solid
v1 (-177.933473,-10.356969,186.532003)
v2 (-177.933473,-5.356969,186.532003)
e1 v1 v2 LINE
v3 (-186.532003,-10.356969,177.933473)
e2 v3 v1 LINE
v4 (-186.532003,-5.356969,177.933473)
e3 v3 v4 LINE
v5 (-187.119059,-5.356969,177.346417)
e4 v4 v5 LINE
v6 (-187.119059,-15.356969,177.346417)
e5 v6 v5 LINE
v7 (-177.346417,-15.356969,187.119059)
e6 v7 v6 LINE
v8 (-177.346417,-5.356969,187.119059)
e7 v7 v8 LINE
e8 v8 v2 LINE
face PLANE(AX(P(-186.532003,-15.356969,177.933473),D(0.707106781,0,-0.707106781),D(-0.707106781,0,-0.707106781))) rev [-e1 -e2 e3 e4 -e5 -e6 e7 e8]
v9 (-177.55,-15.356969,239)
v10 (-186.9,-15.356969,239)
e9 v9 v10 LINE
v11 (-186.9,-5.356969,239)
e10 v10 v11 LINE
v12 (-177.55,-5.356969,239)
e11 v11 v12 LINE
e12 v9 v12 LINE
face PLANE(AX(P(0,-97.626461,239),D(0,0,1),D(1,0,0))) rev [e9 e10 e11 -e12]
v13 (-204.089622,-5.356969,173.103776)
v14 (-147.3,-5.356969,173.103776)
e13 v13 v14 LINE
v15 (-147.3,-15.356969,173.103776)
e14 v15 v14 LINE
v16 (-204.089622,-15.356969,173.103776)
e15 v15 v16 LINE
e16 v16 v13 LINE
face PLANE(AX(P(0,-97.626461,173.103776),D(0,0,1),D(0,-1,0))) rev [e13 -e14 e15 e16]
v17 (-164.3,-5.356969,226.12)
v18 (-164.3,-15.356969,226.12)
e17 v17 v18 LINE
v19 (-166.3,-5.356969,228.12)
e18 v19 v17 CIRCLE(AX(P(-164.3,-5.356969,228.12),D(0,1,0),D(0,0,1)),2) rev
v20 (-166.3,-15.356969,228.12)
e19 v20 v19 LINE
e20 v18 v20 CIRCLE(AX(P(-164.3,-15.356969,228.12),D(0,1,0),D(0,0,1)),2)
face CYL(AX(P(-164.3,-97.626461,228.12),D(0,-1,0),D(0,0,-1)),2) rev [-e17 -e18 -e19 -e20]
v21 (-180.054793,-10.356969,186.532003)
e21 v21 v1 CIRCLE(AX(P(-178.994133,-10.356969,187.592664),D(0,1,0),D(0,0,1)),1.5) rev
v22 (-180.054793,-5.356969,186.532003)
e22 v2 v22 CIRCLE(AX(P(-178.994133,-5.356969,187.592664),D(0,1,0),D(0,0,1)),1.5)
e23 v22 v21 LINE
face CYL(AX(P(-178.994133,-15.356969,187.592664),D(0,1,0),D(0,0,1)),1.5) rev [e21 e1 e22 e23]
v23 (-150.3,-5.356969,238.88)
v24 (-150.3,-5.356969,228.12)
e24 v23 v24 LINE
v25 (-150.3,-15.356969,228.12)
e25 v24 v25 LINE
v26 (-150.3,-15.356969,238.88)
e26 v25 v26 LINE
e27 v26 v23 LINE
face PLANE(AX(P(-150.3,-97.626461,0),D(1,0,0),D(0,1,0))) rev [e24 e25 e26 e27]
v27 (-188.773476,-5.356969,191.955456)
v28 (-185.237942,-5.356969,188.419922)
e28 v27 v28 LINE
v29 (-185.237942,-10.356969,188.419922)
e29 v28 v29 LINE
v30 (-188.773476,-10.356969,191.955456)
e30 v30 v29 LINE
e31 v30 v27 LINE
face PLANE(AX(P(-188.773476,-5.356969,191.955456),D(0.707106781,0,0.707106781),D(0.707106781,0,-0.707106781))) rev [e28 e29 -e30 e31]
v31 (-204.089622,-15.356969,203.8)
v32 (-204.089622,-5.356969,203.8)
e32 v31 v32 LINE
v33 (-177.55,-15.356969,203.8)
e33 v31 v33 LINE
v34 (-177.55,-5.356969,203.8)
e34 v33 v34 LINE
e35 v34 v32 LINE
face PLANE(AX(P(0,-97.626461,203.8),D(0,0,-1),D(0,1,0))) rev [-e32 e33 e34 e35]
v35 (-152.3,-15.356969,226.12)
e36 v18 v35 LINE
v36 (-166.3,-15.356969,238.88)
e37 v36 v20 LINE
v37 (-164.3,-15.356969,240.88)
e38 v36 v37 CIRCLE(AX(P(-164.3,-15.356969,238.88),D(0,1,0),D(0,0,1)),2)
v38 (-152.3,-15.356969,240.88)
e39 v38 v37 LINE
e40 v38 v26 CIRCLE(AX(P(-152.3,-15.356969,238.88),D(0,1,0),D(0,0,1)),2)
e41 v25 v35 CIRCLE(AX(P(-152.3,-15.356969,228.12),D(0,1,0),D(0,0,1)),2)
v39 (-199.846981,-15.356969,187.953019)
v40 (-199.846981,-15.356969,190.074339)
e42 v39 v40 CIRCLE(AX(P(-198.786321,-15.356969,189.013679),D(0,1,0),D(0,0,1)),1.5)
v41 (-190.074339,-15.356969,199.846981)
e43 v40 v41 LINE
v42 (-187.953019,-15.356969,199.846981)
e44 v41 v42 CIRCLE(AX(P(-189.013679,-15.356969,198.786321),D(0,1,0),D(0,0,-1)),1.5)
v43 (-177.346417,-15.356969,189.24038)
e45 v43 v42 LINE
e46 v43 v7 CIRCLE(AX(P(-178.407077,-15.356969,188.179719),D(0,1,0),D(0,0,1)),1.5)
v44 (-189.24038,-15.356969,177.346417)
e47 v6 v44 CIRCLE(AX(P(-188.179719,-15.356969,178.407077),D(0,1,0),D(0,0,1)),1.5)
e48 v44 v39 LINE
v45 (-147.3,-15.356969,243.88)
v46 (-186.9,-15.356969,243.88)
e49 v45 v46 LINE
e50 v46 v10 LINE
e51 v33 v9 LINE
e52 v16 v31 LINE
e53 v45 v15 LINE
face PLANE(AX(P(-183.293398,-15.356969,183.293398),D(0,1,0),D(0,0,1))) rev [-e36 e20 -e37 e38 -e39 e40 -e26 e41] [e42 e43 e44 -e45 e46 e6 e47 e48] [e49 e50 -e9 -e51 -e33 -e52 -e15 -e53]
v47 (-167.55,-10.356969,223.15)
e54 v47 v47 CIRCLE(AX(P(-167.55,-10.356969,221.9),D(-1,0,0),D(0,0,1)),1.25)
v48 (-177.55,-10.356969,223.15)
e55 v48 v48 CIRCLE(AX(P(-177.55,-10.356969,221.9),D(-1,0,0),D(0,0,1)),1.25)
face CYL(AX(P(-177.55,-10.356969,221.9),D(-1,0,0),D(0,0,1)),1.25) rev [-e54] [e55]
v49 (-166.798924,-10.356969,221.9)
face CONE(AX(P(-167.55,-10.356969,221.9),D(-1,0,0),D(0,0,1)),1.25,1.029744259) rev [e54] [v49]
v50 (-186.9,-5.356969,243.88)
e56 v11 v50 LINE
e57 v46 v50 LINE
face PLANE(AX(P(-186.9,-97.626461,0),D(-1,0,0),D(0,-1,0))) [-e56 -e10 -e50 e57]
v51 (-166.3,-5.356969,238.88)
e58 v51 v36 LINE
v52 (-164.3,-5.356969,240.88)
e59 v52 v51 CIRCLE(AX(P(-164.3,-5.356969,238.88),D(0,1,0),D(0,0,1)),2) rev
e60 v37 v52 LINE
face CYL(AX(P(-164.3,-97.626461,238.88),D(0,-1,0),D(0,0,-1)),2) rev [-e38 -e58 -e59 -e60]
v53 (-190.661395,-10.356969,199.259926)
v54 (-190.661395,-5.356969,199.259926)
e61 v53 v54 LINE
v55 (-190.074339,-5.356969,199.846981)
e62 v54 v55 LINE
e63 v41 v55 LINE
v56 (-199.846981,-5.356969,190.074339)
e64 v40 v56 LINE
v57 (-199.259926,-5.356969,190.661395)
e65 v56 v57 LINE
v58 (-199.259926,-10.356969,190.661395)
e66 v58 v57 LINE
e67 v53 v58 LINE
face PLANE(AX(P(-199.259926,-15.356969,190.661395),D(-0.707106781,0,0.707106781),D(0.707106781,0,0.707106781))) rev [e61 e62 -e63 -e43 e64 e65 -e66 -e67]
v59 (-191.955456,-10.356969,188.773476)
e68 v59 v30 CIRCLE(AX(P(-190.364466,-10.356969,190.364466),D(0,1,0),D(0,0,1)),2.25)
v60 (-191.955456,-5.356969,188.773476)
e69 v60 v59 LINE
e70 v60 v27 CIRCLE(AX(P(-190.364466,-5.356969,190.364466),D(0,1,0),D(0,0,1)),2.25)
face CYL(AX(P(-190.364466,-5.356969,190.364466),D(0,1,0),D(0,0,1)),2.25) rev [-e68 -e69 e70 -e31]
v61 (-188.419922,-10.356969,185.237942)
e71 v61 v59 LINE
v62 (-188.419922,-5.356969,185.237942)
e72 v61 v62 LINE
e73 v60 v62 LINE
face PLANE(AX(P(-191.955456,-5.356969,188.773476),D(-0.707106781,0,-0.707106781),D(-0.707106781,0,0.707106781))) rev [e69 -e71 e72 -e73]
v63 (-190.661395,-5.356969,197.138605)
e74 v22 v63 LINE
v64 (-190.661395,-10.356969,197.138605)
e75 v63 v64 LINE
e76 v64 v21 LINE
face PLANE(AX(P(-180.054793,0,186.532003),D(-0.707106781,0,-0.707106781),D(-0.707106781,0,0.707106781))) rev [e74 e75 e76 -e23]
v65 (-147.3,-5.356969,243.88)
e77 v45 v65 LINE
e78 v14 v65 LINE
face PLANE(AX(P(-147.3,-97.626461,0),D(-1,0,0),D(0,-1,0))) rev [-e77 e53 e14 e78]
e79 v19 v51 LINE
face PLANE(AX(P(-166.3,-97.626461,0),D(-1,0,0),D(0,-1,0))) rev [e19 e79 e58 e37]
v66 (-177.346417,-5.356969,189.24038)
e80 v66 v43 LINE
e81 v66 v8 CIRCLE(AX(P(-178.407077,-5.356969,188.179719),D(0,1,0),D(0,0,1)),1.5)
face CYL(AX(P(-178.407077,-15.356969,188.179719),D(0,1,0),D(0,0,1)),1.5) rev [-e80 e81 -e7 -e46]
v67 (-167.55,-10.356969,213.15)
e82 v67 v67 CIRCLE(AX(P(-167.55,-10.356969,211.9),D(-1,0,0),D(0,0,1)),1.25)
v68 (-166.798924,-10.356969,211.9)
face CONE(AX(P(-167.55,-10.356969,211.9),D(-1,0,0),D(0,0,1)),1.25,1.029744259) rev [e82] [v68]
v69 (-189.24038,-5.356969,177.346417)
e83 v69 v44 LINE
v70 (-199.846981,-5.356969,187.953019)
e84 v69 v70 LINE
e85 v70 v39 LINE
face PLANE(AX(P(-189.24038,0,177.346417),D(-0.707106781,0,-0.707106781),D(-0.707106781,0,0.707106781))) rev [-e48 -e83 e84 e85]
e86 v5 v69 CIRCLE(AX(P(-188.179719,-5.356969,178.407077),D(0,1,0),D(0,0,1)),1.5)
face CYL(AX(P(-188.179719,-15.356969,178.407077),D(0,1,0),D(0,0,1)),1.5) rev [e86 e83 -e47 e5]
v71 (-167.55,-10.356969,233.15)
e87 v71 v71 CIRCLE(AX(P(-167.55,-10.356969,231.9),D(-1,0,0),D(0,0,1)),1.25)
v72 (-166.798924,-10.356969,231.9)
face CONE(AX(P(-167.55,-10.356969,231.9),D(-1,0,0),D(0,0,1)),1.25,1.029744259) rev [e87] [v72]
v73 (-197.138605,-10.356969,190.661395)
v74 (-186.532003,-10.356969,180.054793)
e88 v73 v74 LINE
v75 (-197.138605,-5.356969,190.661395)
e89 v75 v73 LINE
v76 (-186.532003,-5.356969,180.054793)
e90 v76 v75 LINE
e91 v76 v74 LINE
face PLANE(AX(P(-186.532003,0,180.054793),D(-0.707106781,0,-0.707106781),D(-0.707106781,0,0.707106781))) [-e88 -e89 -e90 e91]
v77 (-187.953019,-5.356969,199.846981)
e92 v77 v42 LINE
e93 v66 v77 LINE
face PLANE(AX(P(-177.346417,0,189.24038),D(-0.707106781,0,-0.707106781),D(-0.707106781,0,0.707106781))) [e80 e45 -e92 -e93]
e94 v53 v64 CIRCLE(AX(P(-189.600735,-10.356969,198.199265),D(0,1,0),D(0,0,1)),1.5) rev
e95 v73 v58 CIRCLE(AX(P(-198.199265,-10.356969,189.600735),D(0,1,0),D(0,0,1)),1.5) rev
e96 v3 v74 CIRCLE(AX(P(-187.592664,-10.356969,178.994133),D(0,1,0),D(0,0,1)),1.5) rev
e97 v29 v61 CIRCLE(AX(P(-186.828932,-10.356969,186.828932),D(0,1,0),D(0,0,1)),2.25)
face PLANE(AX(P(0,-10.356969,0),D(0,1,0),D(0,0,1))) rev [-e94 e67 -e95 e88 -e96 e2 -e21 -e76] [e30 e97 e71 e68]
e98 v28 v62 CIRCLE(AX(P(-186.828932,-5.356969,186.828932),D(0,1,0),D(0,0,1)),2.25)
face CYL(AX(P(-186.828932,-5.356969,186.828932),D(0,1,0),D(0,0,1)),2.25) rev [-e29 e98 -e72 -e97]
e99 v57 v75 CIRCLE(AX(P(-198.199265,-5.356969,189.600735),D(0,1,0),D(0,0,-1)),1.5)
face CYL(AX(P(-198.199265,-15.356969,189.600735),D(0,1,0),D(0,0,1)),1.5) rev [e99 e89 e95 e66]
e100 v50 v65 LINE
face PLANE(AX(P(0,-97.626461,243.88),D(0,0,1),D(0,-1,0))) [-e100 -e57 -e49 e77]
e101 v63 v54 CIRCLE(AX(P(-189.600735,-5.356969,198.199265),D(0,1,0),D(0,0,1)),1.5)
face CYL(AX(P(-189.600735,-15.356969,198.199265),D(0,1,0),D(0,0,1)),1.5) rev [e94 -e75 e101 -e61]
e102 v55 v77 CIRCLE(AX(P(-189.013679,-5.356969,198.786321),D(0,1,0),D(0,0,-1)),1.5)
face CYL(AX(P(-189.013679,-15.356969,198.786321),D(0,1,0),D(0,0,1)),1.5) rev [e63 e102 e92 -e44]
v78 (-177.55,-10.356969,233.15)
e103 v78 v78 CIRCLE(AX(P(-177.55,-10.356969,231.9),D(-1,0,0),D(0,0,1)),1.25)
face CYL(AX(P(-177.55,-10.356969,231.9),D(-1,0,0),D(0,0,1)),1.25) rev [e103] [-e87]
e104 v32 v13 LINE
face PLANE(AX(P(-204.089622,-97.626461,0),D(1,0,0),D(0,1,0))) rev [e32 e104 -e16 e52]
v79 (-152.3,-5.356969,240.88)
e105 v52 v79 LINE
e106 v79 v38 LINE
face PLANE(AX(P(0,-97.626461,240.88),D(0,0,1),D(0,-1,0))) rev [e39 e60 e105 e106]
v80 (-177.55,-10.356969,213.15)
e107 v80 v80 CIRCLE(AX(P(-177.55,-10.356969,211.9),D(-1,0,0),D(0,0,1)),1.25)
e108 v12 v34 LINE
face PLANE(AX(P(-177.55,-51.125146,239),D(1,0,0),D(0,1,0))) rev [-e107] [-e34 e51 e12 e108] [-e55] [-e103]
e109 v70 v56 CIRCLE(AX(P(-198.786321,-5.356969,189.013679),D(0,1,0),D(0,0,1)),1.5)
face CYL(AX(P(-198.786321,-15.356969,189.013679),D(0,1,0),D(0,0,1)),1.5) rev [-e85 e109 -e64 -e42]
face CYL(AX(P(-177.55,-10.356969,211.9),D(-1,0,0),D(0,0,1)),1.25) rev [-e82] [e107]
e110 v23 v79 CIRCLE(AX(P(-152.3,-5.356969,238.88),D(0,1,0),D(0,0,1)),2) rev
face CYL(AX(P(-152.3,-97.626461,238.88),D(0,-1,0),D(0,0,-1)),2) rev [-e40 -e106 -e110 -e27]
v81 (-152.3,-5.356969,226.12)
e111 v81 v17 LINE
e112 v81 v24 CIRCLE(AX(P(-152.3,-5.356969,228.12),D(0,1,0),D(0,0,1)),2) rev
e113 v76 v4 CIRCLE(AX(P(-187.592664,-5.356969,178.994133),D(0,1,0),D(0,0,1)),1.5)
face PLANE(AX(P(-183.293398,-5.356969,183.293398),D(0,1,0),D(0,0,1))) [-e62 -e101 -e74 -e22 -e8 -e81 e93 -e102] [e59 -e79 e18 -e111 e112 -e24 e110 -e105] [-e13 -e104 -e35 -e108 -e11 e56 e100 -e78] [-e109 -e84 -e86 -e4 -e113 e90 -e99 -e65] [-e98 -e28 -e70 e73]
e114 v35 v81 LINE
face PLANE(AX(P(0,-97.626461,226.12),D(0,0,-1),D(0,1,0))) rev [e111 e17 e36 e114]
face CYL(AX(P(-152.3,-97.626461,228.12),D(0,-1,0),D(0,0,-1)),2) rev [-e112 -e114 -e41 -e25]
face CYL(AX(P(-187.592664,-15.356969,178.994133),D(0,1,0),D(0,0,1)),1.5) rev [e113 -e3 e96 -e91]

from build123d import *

# Parameters (mm, degrees)
SKETCH3_W                       = 3
SKETCH3_H                       = 10
BOSS_EXTRUDE1_DEPTH             = 15
SKETCH3_W_2                     = 9.160158842
BOSS_EXTRUDE1_2_DEPTH           = 15
BOSS_EXTRUDE1_3_DEPTH           = 15
SKETCH4_W                       = 22.820603272
SKETCH4_H                       = 10
BOSS_EXTRUDE2_DEPTH             = 3
SKETCH5_W                       = 22.820603272
SKETCH5_H                       = 10
BOSS_EXTRUDE3_DEPTH             = 3
SKETCH7_W                       = 16
SKETCH7_H                       = 14.76
BOSS_EXTRUDE4_DEPTH             = 10
SKETCH8_W                       = 6.35
SKETCH8_H                       = 35.2
CUT_EXTRUDE1_DEPTH              = 10
TAP_DRILL_FOR_M3X0_5_TAP1_D     = 2.5
TAP_DRILL_FOR_M3X0_5_TAP1_DEPTH = 10
TAP_DRILL_FOR_M3X0_5_TAP1_TIP   = 0.751075774
BOSS_EXTRUDE5_DEPTH             = 10
CUT_EXTRUDE4_DEPTH              = 319.166667347
CUT_EXTRUDE5_DEPTH              = 5
M4_START                        = -10.356969024
M4_CLEARANCE_SLOT1_DEPTH        = 5
FILLET4_R                       = 2


# Read off the part's stored shape, not the designer's step: M4 Clearance Slot1
with BuildPart() as part:
    # Sketch3 → Boss-Extrude1 (new body)
    with BuildSketch(Plane(origin=(-193.9, 0, 193.9), x_dir=(0.7071067811865475, 0, 0.7071067811865477), z_dir=(-0.7071067811865477, 0, 0.7071067811865475))):
        with Locations((-9.910301636, -10.356969024)):
            Rectangle(SKETCH3_W, SKETCH3_H)
    extrude(amount=-BOSS_EXTRUDE1_DEPTH)



with BuildPart() as body_2:
    # Sketch3 → Boss-Extrude1 2 (new body)
    with BuildSketch(Plane(origin=(-193.9, 0, 193.9), x_dir=(0.7071067811865475, 0, 0.7071067811865477), z_dir=(-0.7071067811865477, 0, 0.7071067811865475))):
        with Locations((0, -10.356969024)):
            Rectangle(SKETCH3_W_2, SKETCH3_H)
    extrude(amount=-BOSS_EXTRUDE1_2_DEPTH)


with BuildPart() as body_3:
    # Sketch3 → Boss-Extrude1 3 (new body)
    with BuildSketch(Plane(origin=(-193.9, 0, 193.9), x_dir=(0.7071067811865475, 0, 0.7071067811865477), z_dir=(-0.7071067811865477, 0, 0.7071067811865475))):
        with Locations((9.910301636, -10.356969024)):
            Rectangle(SKETCH3_W, SKETCH3_H)
    extrude(amount=-BOSS_EXTRUDE1_3_DEPTH)


with BuildPart() as part_1:
    add(part.part)

    add(body_2.part)  # Boss-Extrude2 merges body 2

    add(body_3.part)  # Boss-Extrude2 merges body 3
    # Sketch4 → Boss-Extrude2 (add)
    with BuildSketch(Plane(origin=(-193.9, 0, 193.9), x_dir=(0.7071067811865472, 0, 0.7071067811865479), z_dir=(-0.7071067811865479, 0, 0.7071067811865472))):
        with Locations((0, -10.356969024)):
            Rectangle(SKETCH4_W, SKETCH4_H)
    extrude(amount=BOSS_EXTRUDE2_DEPTH)

    # Sketch5 → Boss-Extrude3 (add)
    with BuildSketch(Plane(origin=(-183.293398282, 0, 183.293398282), x_dir=(-0.7071067811865472, 0, -0.7071067811865479), z_dir=(0.7071067811865479, 0, -0.7071067811865472))):
        with Locations((0, -10.356969024)):
            Rectangle(SKETCH5_W, SKETCH5_H)
    extrude(amount=BOSS_EXTRUDE3_DEPTH)

    # Sketch7 → Boss-Extrude4 (add)
    # profile 1 of 2: a face of its own
    with BuildSketch(Plane(origin=(0, -5.356969024, 0), x_dir=(1, 0, 0), z_dir=(0, 1, 0))):
        Polygon((-204.089622006, -203.8), (-188.242640687, -203.8), (-204.089622006, -187.953018681), align=None)
    # profile 2 of 2: a face of its own
    with BuildSketch(Plane(origin=(0, -5.356969024, 0), x_dir=(1, 0, 0), z_dir=(0, 1, 0))):
        Polygon((-183.9, -239), (-186.9, -239), (-186.9, -243.88), (-147.3, -243.88), (-147.3, -173.103776276), (-189.240379601, -173.103776276), (-173.103776276, -189.240379601), (-187.663396675, -203.8), (-183.9, -203.8), align=None)
        with Locations((-158.3, -233.5)):
            Rectangle(SKETCH7_W, SKETCH7_H, mode=Mode.SUBTRACT)
    extrude(amount=-BOSS_EXTRUDE4_DEPTH)

    # Sketch8 → Cut-Extrude1 (cut)
    with BuildSketch(Plane(origin=(0, -5.356969024, 0), x_dir=(1, 0, 0), z_dir=(0, 1, 0))):
        Polygon((-188.242640687, -203.8), (-187.953018681, -204.089622006), (-187.663396675, -203.8), align=None)
        with Locations((-180.725, -221.4)):
            Rectangle(SKETCH8_W, SKETCH8_H)
    extrude(amount=-CUT_EXTRUDE1_DEPTH, mode=Mode.SUBTRACT)

    # Tap Drill for M3x0.5 Tap1
    with Locations(Plane.ZY.offset(177.55)):
        with Locations((211.9, -10.356969024), (231.9, -10.356969024), (221.9, -10.356969024)):
            Hole(TAP_DRILL_FOR_M3X0_5_TAP1_D / 2, depth=TAP_DRILL_FOR_M3X0_5_TAP1_DEPTH)
            with Locations((0, 0, -(TAP_DRILL_FOR_M3X0_5_TAP1_DEPTH + TAP_DRILL_FOR_M3X0_5_TAP1_TIP / 2))):  # 118° drill point
                Cone(0, TAP_DRILL_FOR_M3X0_5_TAP1_D / 2, TAP_DRILL_FOR_M3X0_5_TAP1_TIP, mode=Mode.SUBTRACT)

    # Sketch13 → Boss-Extrude5 (add)
    with BuildSketch(Plane(origin=(0, -5.356969024, 0), x_dir=(1, 0, 0), z_dir=(0, 1, 0))):
        Polygon((-204.089622006, -173.103776276), (-204.089622006, -187.953018681), (-189.240379601, -173.103776276), align=None)
    extrude(amount=-BOSS_EXTRUDE5_DEPTH)

    # Sketch15 → Cut-Extrude4 (cut, through all)
    with BuildSketch(Plane(origin=(0, -5.356969024, 0), x_dir=(1, 0, 0), z_dir=(0, 1, 0))):
        with BuildLine():
            Line((-186.532003499, -177.933472722), (-187.119059257, -177.346416963))
            ThreePointArc((-187.119059257, -177.346416963), (-188.179719429, -176.907077135), (-189.240379601, -177.346416963))
            Line((-189.240379601, -177.346416963), (-199.846981319, -187.953018681))
            ThreePointArc((-199.846981319, -187.953018681), (-200.286321147, -189.013678853), (-199.846981319, -190.074339025))
            Line((-199.846981319, -190.074339025), (-199.25992556, -190.661394783))
            ThreePointArc((-199.25992556, -190.661394783), (-198.199265388, -191.100734612), (-197.138605217, -190.661394783))
            Line((-197.138605217, -190.661394783), (-186.532003499, -180.054793066))
            ThreePointArc((-186.532003499, -180.054793066), (-186.092663671, -178.994132894), (-186.532003499, -177.933472722))
        make_face()
        with BuildLine():
            Line((-177.346416963, -187.119059257), (-177.933472722, -186.532003499))
            ThreePointArc((-177.933472722, -186.532003499), (-178.994132894, -186.092663671), (-180.054793066, -186.532003499))
            Line((-180.054793066, -186.532003499), (-190.661394783, -197.138605217))
            ThreePointArc((-190.661394783, -197.138605217), (-191.100734612, -198.199265388), (-190.661394783, -199.25992556))
            Line((-190.661394783, -199.25992556), (-190.074339025, -199.846981319))
            ThreePointArc((-190.074339025, -199.846981319), (-189.013678853, -200.286321147), (-187.953018681, -199.846981319))
            Line((-187.953018681, -199.846981319), (-177.346416963, -189.240379601))
            ThreePointArc((-177.346416963, -189.240379601), (-176.907077135, -188.179719429), (-177.346416963, -187.119059257))
        make_face()
    extrude(amount=-CUT_EXTRUDE4_DEPTH, mode=Mode.SUBTRACT)

    # Sketch16 → Cut-Extrude5 (cut)
    with BuildSketch(Plane.XZ.offset(15.356969024)):
        Polygon((-187.119059257, 177.346416963), (-177.346416963, 187.119059257), (-190.074339025, 199.846981319), (-199.846981319, 190.074339025), align=None)
    extrude(amount=-CUT_EXTRUDE5_DEPTH, mode=Mode.SUBTRACT)

    # M4 Clearance Slot1 outline → M4 Clearance Slot1 (cut)
    with BuildSketch(Plane(origin=(0, 0, 0), x_dir=(1, 0, 0), z_dir=(0, 1, 0)).offset(M4_START)):
        with BuildLine():
            Line((-188.419922446, -185.23794193), (-191.955456352, -188.773475836))
            ThreePointArc((-191.955456352, -188.773475836), (-191.955456352, -191.955456352), (-188.773475836, -191.955456352))
            Line((-188.773475836, -191.955456352), (-185.23794193, -188.419922446))
            ThreePointArc((-185.23794193, -188.419922446), (-185.23794193, -185.23794193), (-188.419922446, -185.23794193))
        make_face()
    extrude(amount=M4_CLEARANCE_SLOT1_DEPTH, mode=Mode.SUBTRACT)

    # Fillet4
    fillet4_edges = [part_1.edges().sort_by_distance(p)[0] for p in [
        (-166.3, -10.356969024, 240.88),
        (-166.3, -10.356969024, 226.12),
        (-150.3, -10.356969024, 226.12),
        (-150.3, -10.356969024, 240.88),
    ]]
    fillet(fillet4_edges, radius=FILLET4_R)


solid = part_1.part
